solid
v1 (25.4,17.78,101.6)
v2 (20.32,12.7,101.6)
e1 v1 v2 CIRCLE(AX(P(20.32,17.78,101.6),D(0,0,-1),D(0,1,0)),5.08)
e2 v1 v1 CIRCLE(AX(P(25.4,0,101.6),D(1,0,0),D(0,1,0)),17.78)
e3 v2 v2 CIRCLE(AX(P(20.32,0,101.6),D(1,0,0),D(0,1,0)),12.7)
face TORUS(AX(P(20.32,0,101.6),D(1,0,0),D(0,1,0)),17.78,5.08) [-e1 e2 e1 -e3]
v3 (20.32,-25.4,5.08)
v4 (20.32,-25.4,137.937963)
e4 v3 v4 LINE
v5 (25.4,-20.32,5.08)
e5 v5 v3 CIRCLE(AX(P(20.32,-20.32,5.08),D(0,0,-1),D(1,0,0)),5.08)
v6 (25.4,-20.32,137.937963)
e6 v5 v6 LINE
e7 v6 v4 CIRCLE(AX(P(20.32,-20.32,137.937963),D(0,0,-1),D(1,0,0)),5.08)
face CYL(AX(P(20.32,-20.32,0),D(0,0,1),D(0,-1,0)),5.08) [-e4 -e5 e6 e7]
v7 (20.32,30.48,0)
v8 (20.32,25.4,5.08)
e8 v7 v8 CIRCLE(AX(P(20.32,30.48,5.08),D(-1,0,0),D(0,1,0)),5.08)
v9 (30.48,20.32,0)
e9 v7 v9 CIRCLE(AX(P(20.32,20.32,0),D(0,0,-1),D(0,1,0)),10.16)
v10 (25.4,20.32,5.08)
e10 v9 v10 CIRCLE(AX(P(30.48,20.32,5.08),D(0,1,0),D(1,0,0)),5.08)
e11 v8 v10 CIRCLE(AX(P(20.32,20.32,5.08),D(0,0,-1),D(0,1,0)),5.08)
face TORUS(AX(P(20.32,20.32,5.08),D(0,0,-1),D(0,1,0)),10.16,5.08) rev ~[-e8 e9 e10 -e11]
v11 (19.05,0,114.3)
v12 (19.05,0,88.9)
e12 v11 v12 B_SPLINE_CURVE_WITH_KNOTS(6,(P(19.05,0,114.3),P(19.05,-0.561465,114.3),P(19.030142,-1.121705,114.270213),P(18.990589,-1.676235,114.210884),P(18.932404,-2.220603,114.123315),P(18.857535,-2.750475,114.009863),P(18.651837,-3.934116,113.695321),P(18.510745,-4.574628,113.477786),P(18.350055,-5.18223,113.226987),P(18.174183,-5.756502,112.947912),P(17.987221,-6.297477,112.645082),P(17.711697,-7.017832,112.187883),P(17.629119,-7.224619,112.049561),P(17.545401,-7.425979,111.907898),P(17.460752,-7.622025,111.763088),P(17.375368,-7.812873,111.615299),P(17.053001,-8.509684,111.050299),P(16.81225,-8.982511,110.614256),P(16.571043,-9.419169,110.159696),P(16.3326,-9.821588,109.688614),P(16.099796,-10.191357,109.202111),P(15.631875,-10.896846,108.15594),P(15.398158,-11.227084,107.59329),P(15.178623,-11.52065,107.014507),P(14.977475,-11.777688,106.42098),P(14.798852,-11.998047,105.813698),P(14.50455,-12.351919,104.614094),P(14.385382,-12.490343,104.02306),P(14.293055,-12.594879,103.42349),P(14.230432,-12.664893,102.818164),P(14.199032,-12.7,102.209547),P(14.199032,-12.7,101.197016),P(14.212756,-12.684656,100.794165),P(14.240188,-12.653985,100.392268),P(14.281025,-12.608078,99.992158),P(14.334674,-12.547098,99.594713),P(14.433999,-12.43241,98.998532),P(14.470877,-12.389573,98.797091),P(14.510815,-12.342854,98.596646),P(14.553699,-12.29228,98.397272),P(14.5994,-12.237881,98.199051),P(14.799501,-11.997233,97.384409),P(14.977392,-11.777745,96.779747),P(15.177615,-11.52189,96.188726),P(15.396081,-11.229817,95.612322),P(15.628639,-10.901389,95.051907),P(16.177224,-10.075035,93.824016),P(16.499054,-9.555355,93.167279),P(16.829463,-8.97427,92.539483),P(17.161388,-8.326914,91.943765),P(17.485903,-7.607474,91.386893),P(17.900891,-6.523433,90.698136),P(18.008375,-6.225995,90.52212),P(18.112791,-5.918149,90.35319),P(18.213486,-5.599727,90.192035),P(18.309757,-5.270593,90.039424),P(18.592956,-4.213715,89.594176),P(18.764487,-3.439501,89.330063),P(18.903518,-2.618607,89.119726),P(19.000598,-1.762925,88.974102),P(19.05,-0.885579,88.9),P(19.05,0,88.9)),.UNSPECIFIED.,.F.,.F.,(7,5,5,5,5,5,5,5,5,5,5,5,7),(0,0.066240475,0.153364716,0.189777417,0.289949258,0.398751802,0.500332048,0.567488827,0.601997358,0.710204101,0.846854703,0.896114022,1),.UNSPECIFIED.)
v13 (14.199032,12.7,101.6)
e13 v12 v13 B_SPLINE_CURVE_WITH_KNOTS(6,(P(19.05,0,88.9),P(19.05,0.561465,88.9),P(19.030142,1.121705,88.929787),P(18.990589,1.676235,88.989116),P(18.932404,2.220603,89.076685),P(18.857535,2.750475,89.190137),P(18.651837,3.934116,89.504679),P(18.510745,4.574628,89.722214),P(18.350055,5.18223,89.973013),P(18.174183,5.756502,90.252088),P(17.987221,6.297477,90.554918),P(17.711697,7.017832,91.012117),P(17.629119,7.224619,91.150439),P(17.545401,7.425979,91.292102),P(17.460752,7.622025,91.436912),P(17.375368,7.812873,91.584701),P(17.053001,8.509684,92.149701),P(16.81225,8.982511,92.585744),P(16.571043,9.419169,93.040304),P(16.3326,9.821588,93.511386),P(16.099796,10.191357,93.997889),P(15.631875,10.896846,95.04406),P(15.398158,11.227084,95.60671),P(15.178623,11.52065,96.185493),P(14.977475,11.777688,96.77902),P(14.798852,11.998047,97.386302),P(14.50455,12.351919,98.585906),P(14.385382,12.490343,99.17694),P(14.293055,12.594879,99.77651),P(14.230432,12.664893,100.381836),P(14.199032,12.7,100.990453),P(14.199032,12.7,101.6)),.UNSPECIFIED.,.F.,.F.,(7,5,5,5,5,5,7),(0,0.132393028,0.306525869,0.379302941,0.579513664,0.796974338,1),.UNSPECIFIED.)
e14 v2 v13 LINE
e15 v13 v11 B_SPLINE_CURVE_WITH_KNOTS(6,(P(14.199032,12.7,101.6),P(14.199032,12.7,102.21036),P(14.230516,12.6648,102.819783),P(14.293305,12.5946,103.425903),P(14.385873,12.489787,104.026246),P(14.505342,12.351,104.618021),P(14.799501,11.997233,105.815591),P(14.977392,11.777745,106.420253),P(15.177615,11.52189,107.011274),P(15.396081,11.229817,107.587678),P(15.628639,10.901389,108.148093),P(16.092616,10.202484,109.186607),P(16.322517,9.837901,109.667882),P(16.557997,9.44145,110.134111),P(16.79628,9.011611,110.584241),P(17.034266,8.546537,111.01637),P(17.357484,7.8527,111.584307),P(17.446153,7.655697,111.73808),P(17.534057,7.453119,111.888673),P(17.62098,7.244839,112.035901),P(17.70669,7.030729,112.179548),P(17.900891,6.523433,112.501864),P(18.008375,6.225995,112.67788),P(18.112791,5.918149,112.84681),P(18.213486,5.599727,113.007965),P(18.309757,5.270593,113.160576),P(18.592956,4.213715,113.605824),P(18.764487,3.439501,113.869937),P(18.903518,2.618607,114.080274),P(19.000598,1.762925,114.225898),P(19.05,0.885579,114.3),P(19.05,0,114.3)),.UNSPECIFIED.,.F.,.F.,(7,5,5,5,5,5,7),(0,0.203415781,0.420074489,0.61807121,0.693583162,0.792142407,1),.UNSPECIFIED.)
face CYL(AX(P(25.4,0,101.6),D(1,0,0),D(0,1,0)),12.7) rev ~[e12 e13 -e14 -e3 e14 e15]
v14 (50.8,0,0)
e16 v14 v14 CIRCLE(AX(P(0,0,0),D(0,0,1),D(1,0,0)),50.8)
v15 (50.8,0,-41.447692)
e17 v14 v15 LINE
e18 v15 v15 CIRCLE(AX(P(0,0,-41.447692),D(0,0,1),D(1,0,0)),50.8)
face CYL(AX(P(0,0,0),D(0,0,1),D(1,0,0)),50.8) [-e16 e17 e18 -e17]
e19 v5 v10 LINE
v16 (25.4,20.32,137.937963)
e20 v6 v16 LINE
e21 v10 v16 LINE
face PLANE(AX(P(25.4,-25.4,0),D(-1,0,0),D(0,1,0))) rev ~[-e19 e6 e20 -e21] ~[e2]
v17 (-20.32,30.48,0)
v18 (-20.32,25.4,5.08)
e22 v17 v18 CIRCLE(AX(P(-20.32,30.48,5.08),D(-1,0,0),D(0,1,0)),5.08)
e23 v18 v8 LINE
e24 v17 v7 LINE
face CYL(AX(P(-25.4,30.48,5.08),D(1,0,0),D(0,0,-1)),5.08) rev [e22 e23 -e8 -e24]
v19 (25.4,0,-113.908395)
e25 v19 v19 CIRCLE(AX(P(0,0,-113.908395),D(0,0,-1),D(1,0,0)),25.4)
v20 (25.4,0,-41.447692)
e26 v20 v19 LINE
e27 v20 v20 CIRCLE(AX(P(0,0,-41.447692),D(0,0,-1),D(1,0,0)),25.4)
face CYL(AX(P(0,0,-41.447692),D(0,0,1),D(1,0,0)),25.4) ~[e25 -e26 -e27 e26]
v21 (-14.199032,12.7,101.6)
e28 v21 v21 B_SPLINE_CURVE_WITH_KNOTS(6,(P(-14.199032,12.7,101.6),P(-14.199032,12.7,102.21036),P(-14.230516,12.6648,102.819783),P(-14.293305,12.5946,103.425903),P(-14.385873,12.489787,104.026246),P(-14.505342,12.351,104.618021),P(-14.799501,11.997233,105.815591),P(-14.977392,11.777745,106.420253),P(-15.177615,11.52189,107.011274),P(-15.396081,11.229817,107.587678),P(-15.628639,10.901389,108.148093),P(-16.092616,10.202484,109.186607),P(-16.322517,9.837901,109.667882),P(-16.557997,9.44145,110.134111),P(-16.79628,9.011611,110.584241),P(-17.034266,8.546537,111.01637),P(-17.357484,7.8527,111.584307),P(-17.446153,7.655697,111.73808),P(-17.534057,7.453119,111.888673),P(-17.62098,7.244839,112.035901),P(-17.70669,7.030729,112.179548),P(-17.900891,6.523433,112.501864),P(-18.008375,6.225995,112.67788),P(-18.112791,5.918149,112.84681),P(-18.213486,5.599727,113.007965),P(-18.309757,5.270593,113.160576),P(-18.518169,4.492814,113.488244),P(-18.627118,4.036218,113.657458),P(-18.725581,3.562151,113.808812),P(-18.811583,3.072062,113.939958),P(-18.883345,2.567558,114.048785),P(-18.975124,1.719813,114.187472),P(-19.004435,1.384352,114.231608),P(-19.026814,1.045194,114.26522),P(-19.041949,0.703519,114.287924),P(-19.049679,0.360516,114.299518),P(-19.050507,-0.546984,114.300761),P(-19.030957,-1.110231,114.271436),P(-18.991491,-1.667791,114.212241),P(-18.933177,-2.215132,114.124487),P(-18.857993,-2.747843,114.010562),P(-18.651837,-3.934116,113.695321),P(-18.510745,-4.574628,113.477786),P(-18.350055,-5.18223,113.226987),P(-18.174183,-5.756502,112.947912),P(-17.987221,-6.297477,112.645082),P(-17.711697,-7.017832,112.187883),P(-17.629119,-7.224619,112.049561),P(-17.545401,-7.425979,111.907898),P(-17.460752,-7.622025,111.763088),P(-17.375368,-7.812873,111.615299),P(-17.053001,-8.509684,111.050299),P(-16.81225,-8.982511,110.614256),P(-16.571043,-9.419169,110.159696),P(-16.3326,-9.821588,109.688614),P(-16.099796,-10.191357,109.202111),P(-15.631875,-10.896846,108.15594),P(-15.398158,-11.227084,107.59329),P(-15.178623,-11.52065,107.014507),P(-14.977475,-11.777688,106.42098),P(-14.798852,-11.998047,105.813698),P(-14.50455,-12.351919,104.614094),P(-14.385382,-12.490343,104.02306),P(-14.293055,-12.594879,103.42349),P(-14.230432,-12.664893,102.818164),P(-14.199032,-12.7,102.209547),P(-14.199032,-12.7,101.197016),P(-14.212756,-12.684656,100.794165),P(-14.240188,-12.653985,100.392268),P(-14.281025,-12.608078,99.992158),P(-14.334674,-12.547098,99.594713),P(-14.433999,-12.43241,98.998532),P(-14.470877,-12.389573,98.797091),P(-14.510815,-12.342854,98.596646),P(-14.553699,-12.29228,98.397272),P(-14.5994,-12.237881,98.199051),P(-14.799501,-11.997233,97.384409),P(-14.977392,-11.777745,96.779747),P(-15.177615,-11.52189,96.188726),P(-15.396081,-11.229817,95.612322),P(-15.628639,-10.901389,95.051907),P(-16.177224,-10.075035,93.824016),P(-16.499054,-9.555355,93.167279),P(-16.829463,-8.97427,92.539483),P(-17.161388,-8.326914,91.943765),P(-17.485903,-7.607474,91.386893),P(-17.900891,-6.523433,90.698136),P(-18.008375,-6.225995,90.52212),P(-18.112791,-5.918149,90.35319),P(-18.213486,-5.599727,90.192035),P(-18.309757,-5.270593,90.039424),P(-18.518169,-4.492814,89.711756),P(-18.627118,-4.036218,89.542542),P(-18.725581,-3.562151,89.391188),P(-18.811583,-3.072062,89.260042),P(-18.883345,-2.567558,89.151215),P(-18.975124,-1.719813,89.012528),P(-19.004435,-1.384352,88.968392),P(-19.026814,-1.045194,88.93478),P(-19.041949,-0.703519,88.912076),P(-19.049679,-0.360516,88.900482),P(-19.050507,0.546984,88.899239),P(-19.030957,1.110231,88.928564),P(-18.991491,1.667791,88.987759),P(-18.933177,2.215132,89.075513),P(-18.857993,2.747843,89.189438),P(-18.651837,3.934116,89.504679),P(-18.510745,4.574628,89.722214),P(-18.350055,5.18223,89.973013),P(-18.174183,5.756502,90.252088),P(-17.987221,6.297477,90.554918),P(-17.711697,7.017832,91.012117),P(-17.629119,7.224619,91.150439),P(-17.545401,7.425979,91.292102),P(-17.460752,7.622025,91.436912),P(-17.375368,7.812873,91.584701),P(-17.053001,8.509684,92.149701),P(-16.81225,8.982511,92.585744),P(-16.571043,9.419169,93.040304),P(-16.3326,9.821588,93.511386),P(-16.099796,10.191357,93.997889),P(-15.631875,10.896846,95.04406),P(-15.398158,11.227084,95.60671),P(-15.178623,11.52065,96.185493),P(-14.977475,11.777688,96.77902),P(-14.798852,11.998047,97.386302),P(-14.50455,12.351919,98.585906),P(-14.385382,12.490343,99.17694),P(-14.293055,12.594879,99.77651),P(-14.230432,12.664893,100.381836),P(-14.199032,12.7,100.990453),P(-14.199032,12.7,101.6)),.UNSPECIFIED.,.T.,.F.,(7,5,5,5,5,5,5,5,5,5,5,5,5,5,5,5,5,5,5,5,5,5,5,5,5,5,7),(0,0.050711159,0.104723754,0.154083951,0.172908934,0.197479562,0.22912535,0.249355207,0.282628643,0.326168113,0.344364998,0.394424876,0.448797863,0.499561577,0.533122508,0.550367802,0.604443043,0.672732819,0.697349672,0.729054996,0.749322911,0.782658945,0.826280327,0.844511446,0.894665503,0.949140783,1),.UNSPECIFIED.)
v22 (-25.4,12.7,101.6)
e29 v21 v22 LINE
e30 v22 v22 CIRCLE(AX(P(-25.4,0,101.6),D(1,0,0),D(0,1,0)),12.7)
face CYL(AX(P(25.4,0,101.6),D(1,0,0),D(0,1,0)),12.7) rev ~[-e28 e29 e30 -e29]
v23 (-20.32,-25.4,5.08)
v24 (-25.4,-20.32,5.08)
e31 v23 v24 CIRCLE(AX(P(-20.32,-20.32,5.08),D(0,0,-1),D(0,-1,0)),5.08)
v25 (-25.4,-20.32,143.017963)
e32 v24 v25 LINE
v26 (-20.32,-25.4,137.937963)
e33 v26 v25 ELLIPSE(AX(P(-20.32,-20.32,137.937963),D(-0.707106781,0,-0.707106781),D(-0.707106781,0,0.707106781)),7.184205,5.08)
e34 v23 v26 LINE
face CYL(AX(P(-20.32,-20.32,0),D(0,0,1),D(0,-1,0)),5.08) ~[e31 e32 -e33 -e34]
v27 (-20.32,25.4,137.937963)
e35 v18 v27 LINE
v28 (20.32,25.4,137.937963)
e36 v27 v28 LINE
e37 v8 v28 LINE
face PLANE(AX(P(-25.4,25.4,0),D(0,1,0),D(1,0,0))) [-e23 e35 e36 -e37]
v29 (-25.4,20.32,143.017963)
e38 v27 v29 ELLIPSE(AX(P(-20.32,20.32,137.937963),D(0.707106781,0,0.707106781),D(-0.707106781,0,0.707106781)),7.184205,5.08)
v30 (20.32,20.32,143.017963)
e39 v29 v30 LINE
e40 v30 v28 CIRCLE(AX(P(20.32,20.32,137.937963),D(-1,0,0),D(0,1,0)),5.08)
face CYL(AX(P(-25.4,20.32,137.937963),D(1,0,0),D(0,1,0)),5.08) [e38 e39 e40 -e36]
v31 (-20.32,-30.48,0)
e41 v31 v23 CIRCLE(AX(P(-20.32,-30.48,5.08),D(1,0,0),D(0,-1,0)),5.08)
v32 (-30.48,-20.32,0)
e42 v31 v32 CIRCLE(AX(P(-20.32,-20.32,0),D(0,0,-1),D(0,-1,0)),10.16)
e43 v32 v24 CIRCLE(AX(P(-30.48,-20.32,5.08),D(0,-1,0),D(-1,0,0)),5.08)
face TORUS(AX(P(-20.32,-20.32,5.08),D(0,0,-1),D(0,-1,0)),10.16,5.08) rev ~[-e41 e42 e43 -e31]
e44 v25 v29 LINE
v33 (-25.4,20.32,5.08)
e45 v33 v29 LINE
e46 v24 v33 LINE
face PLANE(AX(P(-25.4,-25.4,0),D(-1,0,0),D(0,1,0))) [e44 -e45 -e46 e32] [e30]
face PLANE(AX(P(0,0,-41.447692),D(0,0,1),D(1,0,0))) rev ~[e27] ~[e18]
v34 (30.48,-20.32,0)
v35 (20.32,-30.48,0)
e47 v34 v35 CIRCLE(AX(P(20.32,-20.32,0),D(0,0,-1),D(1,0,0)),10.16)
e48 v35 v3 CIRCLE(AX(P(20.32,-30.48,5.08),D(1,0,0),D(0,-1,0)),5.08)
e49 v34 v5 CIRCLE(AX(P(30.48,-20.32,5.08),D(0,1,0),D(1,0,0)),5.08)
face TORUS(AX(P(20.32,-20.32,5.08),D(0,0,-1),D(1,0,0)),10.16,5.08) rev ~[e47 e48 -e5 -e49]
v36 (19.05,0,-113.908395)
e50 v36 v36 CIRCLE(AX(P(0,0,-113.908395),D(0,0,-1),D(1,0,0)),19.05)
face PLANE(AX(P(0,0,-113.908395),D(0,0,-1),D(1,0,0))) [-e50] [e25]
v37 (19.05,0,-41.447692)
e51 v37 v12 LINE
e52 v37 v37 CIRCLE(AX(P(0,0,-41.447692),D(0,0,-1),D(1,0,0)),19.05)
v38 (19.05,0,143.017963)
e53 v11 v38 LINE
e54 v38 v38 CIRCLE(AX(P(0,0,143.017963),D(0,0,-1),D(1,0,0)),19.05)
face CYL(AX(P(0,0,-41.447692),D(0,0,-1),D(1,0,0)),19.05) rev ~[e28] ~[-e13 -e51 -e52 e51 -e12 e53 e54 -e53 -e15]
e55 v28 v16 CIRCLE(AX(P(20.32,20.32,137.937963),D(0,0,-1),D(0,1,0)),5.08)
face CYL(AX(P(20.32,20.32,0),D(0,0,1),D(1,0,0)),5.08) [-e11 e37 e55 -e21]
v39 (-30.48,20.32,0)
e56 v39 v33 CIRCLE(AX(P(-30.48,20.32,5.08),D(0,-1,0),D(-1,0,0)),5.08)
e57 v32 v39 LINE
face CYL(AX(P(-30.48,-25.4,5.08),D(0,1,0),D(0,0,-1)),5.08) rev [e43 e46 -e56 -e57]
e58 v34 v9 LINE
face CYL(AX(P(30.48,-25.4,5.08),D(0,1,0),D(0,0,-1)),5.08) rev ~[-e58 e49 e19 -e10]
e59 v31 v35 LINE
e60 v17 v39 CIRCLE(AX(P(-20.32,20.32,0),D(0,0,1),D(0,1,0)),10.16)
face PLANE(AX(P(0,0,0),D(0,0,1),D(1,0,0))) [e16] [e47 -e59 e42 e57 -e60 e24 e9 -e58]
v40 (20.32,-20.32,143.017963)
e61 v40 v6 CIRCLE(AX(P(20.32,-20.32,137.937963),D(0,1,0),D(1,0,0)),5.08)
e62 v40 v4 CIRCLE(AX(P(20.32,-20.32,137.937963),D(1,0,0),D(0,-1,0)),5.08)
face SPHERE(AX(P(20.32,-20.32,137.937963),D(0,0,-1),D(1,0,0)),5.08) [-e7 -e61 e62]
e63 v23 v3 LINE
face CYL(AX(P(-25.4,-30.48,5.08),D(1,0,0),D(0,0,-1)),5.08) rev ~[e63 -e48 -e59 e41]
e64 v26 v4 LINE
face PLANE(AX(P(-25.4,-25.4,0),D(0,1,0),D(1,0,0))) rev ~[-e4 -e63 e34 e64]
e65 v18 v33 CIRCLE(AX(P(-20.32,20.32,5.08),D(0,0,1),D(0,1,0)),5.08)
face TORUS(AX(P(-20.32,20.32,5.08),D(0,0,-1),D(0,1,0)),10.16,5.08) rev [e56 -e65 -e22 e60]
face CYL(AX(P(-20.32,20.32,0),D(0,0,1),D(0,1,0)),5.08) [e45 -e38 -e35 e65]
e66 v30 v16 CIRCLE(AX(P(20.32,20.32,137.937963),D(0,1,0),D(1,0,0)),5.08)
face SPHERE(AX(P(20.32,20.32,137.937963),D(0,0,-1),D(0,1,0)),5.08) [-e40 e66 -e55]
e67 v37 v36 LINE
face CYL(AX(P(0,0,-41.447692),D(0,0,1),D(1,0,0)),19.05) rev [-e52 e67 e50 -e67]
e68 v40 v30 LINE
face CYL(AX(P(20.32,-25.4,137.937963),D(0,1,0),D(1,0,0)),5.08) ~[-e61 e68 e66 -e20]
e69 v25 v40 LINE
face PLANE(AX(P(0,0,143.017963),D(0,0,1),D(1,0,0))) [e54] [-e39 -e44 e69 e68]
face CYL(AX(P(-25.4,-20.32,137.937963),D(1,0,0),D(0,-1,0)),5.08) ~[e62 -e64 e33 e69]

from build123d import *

# Parameters (mm, degrees)
F0_R      = 50.8
F1_DEPTH  = 41.4476916194
F2_W      = 50.8
F2_H      = 50.8
F3_DEPTH  = 143.017962575
F4_R      = 12.7
F5_DEPTH  = 76.201
F6_R      = 5.08
F7_R      = 19.05
F8_DEPTH  = 184.4666541944
F9_R      = 25.4
F9_R_2    = 19.05
F10_DEPTH = 72.4607035518


with BuildPart() as f1:
    # F0 (on Top) → F1 (new body)
    with BuildSketch(Plane.XY):
        Circle(F0_R)
    extrude(amount=-F1_DEPTH)

    # F2 (on face) → F3 (join)
    with BuildSketch(Plane.XY):
        Rectangle(F2_W, F2_H)
    extrude(amount=F3_DEPTH)

    # F4 (on face) → F5 (cut, through all)
    with BuildSketch(Plane.YZ.offset(25.4)):
        with Locations((0, 101.6)):
            Circle(F4_R)
    extrude(amount=-F5_DEPTH, mode=Mode.SUBTRACT)

    # F6
    f6_edges = [f1.edges().sort_by_distance(p)[0] for p in [
        (25.4, 25.4, 71.508981),
        (-25.4, 25.4, 71.508981),
        (0, 25.4, 0),
        (0, 25.4, 143.017963),
        (25.4, -25.4, 71.508981),
        (25.4, 0, 0),
        (25.4, 0, 143.017963),
        (25.4, -12.7, 101.6),
        (-25.4, -25.4, 71.508981),
        (0, -25.4, 0),
        (0, -25.4, 143.017963),
        (-25.4, 0, 0),
    ]]
    fillet(f6_edges, radius=F6_R)

    # F7 (on face) → F8 (cut, through all)
    with BuildSketch(Plane(origin=(0, 0, -41.4476916194), x_dir=(1, 0, 0), z_dir=(0, 0, -1))):
        Circle(F7_R)
    extrude(amount=-F8_DEPTH, mode=Mode.SUBTRACT)

    # F9 (on face) → F10 (join)
    with BuildSketch(Plane(origin=(0, 0, -41.4476916194), x_dir=(1, 0, 0), z_dir=(0, 0, -1))):
        Circle(F9_R)
        Circle(F9_R_2, mode=Mode.SUBTRACT)
    extrude(amount=F10_DEPTH)


solid = f1.part
